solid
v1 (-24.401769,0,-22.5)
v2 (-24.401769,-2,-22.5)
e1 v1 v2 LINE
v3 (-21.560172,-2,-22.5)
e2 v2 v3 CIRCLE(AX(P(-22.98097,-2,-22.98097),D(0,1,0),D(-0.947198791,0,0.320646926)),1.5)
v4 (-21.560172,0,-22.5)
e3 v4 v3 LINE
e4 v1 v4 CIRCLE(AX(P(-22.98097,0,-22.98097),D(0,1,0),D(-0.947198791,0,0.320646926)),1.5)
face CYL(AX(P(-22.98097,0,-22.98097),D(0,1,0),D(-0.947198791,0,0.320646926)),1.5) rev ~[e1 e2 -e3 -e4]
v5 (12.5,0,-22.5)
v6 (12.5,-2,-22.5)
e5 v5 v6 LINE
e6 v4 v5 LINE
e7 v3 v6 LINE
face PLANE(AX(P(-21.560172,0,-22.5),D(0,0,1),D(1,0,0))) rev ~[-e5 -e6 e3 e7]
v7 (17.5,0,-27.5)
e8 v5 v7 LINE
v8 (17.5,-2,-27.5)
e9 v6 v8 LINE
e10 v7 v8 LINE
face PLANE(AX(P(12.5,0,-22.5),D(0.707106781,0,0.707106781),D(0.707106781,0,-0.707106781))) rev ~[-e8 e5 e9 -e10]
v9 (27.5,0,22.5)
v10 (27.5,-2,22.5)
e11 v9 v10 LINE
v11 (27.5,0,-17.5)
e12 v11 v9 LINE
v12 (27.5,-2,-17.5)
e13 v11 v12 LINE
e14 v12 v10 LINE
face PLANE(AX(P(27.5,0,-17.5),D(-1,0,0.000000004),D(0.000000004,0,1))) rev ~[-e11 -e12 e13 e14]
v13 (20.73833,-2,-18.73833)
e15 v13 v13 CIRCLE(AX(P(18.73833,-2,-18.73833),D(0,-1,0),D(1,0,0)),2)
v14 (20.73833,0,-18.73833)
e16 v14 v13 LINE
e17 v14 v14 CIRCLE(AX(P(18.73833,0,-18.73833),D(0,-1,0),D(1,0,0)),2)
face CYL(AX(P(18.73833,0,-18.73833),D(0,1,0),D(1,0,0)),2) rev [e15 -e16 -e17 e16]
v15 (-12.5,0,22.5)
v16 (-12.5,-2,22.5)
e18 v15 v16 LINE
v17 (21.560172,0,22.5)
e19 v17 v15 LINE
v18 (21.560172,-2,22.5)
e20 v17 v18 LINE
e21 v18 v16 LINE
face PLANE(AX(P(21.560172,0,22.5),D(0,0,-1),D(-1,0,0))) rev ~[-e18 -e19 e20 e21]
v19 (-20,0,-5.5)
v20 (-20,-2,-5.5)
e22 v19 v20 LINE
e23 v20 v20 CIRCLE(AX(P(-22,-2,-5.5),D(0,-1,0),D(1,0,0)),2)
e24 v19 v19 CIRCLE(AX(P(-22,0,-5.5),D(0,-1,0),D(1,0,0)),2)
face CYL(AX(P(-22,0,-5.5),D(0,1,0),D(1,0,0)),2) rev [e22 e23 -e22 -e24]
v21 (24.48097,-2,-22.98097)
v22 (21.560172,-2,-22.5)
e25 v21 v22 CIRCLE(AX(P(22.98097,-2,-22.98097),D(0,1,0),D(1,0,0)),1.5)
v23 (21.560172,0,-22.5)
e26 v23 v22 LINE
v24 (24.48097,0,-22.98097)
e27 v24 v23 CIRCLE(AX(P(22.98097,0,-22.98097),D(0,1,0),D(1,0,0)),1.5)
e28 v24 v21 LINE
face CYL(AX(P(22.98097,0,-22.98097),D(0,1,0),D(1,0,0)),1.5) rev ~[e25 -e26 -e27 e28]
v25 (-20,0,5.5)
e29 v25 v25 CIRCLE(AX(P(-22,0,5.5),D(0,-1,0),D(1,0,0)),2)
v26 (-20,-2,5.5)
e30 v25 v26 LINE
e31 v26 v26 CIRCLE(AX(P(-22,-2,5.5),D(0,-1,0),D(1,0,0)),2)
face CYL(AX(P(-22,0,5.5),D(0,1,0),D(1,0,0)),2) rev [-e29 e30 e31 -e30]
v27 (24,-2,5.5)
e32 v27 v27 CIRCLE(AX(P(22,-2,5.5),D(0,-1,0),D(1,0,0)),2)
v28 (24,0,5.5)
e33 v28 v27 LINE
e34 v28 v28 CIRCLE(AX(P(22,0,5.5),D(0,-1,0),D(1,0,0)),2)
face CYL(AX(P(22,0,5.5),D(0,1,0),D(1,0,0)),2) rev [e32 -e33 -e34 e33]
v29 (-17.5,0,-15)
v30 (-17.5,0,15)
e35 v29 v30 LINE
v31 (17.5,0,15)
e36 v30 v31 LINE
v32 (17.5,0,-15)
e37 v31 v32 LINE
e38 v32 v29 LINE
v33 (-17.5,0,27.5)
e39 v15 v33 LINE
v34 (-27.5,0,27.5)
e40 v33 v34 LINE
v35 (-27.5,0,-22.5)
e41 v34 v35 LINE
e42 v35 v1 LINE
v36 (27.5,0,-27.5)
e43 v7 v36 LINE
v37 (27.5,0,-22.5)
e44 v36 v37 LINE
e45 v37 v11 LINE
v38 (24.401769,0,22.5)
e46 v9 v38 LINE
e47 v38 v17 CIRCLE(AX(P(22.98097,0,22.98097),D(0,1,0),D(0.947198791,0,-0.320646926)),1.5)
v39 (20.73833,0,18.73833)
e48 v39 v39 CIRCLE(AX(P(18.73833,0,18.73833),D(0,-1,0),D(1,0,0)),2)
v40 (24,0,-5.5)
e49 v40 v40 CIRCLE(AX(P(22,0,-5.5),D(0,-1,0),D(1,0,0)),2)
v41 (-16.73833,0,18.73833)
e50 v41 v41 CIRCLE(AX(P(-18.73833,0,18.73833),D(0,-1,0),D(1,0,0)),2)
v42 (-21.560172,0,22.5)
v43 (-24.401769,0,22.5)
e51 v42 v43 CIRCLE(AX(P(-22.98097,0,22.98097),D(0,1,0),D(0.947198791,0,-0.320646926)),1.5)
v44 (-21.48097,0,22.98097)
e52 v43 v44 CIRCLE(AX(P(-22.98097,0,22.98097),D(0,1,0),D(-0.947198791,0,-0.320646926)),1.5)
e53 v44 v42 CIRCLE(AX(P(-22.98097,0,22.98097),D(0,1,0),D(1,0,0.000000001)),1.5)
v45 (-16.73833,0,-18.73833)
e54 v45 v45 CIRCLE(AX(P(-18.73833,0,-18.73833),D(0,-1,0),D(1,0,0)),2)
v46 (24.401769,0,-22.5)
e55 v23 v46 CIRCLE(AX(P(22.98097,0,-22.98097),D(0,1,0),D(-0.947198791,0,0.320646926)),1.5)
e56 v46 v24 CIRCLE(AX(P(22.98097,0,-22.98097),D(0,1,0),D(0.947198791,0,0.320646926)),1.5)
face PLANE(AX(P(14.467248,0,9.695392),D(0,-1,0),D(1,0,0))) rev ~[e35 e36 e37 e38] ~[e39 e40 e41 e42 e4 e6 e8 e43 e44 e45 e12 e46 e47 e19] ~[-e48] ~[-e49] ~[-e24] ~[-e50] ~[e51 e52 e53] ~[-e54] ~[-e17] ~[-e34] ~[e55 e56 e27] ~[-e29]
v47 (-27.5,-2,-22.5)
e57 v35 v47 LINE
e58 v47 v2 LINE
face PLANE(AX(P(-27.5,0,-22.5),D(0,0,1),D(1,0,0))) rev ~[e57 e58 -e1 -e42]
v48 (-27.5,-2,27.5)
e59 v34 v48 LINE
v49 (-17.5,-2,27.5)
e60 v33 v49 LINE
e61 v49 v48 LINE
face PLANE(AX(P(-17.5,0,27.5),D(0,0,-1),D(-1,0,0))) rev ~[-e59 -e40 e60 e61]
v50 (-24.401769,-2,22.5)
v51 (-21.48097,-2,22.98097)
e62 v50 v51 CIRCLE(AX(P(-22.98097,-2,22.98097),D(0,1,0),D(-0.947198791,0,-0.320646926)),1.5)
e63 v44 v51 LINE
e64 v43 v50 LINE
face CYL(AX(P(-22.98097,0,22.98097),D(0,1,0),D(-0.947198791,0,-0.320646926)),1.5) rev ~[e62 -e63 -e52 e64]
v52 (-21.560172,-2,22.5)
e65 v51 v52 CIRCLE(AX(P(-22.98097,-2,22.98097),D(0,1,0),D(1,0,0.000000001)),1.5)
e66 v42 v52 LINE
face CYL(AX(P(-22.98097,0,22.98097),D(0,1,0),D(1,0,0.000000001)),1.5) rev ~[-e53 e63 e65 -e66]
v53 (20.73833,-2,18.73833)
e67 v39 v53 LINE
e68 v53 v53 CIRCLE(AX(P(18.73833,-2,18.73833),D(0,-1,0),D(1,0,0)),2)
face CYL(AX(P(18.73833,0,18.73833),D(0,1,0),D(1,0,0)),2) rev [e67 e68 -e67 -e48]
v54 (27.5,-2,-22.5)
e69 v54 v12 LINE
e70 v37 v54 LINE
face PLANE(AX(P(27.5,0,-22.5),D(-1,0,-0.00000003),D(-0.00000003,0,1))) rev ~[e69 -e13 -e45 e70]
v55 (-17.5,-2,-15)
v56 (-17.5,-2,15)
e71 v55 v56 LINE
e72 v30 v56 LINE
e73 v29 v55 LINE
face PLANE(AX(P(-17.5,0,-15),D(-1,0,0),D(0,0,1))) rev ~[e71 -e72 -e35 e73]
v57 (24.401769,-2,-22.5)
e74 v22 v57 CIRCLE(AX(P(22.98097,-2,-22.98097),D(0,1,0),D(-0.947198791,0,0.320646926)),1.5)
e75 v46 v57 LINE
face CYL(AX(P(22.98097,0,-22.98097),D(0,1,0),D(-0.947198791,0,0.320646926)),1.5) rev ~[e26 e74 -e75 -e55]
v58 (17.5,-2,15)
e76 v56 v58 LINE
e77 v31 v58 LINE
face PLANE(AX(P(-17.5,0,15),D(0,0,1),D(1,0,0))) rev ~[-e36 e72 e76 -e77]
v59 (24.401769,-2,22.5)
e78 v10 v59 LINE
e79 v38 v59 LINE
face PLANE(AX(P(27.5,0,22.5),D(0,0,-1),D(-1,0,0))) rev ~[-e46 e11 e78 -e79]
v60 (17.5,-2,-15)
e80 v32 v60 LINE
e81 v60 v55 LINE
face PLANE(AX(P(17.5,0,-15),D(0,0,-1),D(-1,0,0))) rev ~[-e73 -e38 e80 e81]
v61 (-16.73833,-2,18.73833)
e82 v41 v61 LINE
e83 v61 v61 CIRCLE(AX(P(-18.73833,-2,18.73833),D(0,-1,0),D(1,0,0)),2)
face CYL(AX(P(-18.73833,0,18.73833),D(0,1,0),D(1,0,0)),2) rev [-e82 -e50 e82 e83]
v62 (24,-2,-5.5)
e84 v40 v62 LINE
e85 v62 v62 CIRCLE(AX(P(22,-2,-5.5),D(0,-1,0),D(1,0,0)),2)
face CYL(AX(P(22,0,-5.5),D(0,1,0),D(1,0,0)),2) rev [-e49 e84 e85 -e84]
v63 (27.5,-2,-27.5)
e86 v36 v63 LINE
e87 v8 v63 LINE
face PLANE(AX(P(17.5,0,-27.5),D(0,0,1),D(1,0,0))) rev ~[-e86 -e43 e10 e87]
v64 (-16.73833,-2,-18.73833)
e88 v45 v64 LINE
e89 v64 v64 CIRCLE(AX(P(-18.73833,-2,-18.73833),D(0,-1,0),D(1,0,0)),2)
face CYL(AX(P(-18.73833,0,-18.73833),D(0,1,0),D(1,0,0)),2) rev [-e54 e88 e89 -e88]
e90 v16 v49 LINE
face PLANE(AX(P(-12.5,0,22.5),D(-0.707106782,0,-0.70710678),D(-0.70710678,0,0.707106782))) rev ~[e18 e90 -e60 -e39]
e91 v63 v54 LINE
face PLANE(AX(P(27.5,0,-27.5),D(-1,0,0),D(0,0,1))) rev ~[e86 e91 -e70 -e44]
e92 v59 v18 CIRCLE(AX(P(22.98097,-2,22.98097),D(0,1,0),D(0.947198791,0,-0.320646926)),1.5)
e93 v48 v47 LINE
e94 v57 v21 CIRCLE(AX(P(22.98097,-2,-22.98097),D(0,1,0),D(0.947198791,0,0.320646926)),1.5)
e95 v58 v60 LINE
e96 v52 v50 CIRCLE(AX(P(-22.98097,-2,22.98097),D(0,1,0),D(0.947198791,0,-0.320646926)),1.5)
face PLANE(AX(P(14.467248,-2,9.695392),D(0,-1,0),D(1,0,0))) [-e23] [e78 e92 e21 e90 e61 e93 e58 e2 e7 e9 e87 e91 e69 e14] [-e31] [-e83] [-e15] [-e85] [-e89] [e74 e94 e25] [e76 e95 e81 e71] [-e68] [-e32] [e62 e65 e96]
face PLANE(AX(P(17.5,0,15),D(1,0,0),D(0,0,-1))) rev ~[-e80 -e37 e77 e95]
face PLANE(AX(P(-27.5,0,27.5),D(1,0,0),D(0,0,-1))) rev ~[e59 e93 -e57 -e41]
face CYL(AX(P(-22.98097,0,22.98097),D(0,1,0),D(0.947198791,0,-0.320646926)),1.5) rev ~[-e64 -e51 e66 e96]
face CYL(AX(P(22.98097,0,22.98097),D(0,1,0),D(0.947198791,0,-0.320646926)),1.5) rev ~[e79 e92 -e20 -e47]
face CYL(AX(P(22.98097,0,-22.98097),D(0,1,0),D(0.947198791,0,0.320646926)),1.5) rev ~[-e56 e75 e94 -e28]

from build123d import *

# Parameters (mm, degrees)
F0_R     = 2
F1_DEPTH = 2


# Not quite as in the source:
# - ends of sketch curves that miss each other by under 0.0002 mm in the source are joined
# - a feature names something its author has since deleted; it is built from what else it names


with BuildPart() as f1:
    # F0 (on Front) → F1 (new body)
    with BuildSketch(Plane.XZ):
        with BuildLine():
            Line((21.5601722026, 22.5), (-12.5000000166, 22.5))
            Line((-12.5000000166, 22.5), (-5.0000000414, 15))
            Line((-5.0000000414, 15), (17.5, 15))
            Line((17.5, 15), (17.5, -7.5000001159))
            Line((17.5, -7.5000001159), (27.499999851, -17.5))
            Line((27.499999851, -17.5), (27.5, 22.5))
            Line((27.5, 22.5), (24.4017685746, 22.5))
            ThreePointArc((24.4017685746, 22.5), (22.9809703886, 21.4809703886), (21.5601722026, 22.5))
        make_face()
        with Locations((22, -5.5)):
            Circle(F0_R, mode=Mode.SUBTRACT)
        with Locations((22, 5.5)):
            Circle(F0_R, mode=Mode.SUBTRACT)
        with Locations((18.7383297014, 18.7383297014)):
            Circle(F0_R, mode=Mode.SUBTRACT)
        with BuildLine():
            Line((27.499999851, -17.5), (17.5, -7.5000001159))
            Line((17.5, -7.5000001159), (17.5, -15))
            Line((17.5, -15), (5, -15))
            Line((5, -15), (12.5, -22.5))
            Line((12.5, -22.5), (21.5601722026, -22.5))
            ThreePointArc((21.5601722026, -22.5), (22.9809703886, -21.4809703886), (24.4017685746, -22.5))
            Line((24.4017685746, -22.5), (27.5, -22.5))
            Line((27.5, -22.5), (27.499999851, -17.5))
        make_face()
        with Locations((18.7383297014, -18.7383297014)):
            Circle(F0_R, mode=Mode.SUBTRACT)
        with BuildLine():
            Line((21.5601722026, -22.5), (12.5, -22.5))
            Line((12.5, -22.5), (17.5, -27.5))
            Line((17.5, -27.5), (27.5, -27.5))
            Line((27.5, -27.5), (27.5, -22.5))
            Line((27.5, -22.5), (24.4017685746, -22.5))
            ThreePointArc((24.4017685746, -22.5), (24.461037495, -22.7372464453), (24.4809703886, -22.9809703886))
            ThreePointArc((24.4809703886, -22.9809703886), (22.7372464453, -24.461037495), (21.5601722026, -22.5))
        make_face()
        with BuildLine():
            Line((-17.5, 7.5), (-27.5, 17.5))
            Line((-27.5, 17.5), (-27.5, -22.5))
            Line((-27.5, -22.5), (-24.4017685746, -22.5))
            ThreePointArc((-24.4017685746, -22.5), (-22.9809703886, -21.4809703886), (-21.5601722026, -22.5))
            Line((-21.5601722026, -22.5), (12.5, -22.5))
            Line((12.5, -22.5), (5, -15))
            Line((5, -15), (-17.5, -15))
            Line((-17.5, -15), (-17.5, 7.5))
        make_face()
        with Locations((-18.7383297014, -18.7383297014)):
            Circle(F0_R, mode=Mode.SUBTRACT)
        with Locations((-22, -5.5)):
            Circle(F0_R, mode=Mode.SUBTRACT)
        with Locations((-22, 5.5)):
            Circle(F0_R, mode=Mode.SUBTRACT)
        with BuildLine():
            ThreePointArc((-21.5601722026, 22.5), (-22.9809703886, 21.4809703886), (-24.4017685746, 22.5))
            Line((-24.4017685746, 22.5), (-27.5, 22.5))
            Line((-27.5, 22.5), (-27.5, 17.5))
            Line((-27.5, 17.5), (-17.5, 7.5))
            Line((-17.5, 7.5), (-17.5, 15))
            Line((-17.5, 15), (-5.0000000414, 15))
            Line((-5.0000000414, 15), (-12.5000000166, 22.5))
            Line((-12.5000000166, 22.5), (-21.5601722026, 22.5))
        make_face()
        with Locations((-18.7383297014, 18.7383297014)):
            Circle(F0_R, mode=Mode.SUBTRACT)
        with BuildLine():
            ThreePointArc((-24.4017685746, 22.5), (-23.2246943318, 24.461037495), (-21.4809703886, 22.9809703886))
            ThreePointArc((-21.4809703886, 22.9809703886), (-21.5009032821, 22.7372464453), (-21.5601722026, 22.5))
            Line((-21.5601722026, 22.5), (-12.5000000166, 22.5))
            Line((-12.5000000166, 22.5), (-17.5, 27.5))
            Line((-17.5, 27.5), (-27.5, 27.5))
            Line((-27.5, 27.5), (-27.5, 22.5))
            Line((-27.5, 22.5), (-24.4017685746, 22.5))
        make_face()
    extrude(amount=F1_DEPTH)


solid = f1.part
